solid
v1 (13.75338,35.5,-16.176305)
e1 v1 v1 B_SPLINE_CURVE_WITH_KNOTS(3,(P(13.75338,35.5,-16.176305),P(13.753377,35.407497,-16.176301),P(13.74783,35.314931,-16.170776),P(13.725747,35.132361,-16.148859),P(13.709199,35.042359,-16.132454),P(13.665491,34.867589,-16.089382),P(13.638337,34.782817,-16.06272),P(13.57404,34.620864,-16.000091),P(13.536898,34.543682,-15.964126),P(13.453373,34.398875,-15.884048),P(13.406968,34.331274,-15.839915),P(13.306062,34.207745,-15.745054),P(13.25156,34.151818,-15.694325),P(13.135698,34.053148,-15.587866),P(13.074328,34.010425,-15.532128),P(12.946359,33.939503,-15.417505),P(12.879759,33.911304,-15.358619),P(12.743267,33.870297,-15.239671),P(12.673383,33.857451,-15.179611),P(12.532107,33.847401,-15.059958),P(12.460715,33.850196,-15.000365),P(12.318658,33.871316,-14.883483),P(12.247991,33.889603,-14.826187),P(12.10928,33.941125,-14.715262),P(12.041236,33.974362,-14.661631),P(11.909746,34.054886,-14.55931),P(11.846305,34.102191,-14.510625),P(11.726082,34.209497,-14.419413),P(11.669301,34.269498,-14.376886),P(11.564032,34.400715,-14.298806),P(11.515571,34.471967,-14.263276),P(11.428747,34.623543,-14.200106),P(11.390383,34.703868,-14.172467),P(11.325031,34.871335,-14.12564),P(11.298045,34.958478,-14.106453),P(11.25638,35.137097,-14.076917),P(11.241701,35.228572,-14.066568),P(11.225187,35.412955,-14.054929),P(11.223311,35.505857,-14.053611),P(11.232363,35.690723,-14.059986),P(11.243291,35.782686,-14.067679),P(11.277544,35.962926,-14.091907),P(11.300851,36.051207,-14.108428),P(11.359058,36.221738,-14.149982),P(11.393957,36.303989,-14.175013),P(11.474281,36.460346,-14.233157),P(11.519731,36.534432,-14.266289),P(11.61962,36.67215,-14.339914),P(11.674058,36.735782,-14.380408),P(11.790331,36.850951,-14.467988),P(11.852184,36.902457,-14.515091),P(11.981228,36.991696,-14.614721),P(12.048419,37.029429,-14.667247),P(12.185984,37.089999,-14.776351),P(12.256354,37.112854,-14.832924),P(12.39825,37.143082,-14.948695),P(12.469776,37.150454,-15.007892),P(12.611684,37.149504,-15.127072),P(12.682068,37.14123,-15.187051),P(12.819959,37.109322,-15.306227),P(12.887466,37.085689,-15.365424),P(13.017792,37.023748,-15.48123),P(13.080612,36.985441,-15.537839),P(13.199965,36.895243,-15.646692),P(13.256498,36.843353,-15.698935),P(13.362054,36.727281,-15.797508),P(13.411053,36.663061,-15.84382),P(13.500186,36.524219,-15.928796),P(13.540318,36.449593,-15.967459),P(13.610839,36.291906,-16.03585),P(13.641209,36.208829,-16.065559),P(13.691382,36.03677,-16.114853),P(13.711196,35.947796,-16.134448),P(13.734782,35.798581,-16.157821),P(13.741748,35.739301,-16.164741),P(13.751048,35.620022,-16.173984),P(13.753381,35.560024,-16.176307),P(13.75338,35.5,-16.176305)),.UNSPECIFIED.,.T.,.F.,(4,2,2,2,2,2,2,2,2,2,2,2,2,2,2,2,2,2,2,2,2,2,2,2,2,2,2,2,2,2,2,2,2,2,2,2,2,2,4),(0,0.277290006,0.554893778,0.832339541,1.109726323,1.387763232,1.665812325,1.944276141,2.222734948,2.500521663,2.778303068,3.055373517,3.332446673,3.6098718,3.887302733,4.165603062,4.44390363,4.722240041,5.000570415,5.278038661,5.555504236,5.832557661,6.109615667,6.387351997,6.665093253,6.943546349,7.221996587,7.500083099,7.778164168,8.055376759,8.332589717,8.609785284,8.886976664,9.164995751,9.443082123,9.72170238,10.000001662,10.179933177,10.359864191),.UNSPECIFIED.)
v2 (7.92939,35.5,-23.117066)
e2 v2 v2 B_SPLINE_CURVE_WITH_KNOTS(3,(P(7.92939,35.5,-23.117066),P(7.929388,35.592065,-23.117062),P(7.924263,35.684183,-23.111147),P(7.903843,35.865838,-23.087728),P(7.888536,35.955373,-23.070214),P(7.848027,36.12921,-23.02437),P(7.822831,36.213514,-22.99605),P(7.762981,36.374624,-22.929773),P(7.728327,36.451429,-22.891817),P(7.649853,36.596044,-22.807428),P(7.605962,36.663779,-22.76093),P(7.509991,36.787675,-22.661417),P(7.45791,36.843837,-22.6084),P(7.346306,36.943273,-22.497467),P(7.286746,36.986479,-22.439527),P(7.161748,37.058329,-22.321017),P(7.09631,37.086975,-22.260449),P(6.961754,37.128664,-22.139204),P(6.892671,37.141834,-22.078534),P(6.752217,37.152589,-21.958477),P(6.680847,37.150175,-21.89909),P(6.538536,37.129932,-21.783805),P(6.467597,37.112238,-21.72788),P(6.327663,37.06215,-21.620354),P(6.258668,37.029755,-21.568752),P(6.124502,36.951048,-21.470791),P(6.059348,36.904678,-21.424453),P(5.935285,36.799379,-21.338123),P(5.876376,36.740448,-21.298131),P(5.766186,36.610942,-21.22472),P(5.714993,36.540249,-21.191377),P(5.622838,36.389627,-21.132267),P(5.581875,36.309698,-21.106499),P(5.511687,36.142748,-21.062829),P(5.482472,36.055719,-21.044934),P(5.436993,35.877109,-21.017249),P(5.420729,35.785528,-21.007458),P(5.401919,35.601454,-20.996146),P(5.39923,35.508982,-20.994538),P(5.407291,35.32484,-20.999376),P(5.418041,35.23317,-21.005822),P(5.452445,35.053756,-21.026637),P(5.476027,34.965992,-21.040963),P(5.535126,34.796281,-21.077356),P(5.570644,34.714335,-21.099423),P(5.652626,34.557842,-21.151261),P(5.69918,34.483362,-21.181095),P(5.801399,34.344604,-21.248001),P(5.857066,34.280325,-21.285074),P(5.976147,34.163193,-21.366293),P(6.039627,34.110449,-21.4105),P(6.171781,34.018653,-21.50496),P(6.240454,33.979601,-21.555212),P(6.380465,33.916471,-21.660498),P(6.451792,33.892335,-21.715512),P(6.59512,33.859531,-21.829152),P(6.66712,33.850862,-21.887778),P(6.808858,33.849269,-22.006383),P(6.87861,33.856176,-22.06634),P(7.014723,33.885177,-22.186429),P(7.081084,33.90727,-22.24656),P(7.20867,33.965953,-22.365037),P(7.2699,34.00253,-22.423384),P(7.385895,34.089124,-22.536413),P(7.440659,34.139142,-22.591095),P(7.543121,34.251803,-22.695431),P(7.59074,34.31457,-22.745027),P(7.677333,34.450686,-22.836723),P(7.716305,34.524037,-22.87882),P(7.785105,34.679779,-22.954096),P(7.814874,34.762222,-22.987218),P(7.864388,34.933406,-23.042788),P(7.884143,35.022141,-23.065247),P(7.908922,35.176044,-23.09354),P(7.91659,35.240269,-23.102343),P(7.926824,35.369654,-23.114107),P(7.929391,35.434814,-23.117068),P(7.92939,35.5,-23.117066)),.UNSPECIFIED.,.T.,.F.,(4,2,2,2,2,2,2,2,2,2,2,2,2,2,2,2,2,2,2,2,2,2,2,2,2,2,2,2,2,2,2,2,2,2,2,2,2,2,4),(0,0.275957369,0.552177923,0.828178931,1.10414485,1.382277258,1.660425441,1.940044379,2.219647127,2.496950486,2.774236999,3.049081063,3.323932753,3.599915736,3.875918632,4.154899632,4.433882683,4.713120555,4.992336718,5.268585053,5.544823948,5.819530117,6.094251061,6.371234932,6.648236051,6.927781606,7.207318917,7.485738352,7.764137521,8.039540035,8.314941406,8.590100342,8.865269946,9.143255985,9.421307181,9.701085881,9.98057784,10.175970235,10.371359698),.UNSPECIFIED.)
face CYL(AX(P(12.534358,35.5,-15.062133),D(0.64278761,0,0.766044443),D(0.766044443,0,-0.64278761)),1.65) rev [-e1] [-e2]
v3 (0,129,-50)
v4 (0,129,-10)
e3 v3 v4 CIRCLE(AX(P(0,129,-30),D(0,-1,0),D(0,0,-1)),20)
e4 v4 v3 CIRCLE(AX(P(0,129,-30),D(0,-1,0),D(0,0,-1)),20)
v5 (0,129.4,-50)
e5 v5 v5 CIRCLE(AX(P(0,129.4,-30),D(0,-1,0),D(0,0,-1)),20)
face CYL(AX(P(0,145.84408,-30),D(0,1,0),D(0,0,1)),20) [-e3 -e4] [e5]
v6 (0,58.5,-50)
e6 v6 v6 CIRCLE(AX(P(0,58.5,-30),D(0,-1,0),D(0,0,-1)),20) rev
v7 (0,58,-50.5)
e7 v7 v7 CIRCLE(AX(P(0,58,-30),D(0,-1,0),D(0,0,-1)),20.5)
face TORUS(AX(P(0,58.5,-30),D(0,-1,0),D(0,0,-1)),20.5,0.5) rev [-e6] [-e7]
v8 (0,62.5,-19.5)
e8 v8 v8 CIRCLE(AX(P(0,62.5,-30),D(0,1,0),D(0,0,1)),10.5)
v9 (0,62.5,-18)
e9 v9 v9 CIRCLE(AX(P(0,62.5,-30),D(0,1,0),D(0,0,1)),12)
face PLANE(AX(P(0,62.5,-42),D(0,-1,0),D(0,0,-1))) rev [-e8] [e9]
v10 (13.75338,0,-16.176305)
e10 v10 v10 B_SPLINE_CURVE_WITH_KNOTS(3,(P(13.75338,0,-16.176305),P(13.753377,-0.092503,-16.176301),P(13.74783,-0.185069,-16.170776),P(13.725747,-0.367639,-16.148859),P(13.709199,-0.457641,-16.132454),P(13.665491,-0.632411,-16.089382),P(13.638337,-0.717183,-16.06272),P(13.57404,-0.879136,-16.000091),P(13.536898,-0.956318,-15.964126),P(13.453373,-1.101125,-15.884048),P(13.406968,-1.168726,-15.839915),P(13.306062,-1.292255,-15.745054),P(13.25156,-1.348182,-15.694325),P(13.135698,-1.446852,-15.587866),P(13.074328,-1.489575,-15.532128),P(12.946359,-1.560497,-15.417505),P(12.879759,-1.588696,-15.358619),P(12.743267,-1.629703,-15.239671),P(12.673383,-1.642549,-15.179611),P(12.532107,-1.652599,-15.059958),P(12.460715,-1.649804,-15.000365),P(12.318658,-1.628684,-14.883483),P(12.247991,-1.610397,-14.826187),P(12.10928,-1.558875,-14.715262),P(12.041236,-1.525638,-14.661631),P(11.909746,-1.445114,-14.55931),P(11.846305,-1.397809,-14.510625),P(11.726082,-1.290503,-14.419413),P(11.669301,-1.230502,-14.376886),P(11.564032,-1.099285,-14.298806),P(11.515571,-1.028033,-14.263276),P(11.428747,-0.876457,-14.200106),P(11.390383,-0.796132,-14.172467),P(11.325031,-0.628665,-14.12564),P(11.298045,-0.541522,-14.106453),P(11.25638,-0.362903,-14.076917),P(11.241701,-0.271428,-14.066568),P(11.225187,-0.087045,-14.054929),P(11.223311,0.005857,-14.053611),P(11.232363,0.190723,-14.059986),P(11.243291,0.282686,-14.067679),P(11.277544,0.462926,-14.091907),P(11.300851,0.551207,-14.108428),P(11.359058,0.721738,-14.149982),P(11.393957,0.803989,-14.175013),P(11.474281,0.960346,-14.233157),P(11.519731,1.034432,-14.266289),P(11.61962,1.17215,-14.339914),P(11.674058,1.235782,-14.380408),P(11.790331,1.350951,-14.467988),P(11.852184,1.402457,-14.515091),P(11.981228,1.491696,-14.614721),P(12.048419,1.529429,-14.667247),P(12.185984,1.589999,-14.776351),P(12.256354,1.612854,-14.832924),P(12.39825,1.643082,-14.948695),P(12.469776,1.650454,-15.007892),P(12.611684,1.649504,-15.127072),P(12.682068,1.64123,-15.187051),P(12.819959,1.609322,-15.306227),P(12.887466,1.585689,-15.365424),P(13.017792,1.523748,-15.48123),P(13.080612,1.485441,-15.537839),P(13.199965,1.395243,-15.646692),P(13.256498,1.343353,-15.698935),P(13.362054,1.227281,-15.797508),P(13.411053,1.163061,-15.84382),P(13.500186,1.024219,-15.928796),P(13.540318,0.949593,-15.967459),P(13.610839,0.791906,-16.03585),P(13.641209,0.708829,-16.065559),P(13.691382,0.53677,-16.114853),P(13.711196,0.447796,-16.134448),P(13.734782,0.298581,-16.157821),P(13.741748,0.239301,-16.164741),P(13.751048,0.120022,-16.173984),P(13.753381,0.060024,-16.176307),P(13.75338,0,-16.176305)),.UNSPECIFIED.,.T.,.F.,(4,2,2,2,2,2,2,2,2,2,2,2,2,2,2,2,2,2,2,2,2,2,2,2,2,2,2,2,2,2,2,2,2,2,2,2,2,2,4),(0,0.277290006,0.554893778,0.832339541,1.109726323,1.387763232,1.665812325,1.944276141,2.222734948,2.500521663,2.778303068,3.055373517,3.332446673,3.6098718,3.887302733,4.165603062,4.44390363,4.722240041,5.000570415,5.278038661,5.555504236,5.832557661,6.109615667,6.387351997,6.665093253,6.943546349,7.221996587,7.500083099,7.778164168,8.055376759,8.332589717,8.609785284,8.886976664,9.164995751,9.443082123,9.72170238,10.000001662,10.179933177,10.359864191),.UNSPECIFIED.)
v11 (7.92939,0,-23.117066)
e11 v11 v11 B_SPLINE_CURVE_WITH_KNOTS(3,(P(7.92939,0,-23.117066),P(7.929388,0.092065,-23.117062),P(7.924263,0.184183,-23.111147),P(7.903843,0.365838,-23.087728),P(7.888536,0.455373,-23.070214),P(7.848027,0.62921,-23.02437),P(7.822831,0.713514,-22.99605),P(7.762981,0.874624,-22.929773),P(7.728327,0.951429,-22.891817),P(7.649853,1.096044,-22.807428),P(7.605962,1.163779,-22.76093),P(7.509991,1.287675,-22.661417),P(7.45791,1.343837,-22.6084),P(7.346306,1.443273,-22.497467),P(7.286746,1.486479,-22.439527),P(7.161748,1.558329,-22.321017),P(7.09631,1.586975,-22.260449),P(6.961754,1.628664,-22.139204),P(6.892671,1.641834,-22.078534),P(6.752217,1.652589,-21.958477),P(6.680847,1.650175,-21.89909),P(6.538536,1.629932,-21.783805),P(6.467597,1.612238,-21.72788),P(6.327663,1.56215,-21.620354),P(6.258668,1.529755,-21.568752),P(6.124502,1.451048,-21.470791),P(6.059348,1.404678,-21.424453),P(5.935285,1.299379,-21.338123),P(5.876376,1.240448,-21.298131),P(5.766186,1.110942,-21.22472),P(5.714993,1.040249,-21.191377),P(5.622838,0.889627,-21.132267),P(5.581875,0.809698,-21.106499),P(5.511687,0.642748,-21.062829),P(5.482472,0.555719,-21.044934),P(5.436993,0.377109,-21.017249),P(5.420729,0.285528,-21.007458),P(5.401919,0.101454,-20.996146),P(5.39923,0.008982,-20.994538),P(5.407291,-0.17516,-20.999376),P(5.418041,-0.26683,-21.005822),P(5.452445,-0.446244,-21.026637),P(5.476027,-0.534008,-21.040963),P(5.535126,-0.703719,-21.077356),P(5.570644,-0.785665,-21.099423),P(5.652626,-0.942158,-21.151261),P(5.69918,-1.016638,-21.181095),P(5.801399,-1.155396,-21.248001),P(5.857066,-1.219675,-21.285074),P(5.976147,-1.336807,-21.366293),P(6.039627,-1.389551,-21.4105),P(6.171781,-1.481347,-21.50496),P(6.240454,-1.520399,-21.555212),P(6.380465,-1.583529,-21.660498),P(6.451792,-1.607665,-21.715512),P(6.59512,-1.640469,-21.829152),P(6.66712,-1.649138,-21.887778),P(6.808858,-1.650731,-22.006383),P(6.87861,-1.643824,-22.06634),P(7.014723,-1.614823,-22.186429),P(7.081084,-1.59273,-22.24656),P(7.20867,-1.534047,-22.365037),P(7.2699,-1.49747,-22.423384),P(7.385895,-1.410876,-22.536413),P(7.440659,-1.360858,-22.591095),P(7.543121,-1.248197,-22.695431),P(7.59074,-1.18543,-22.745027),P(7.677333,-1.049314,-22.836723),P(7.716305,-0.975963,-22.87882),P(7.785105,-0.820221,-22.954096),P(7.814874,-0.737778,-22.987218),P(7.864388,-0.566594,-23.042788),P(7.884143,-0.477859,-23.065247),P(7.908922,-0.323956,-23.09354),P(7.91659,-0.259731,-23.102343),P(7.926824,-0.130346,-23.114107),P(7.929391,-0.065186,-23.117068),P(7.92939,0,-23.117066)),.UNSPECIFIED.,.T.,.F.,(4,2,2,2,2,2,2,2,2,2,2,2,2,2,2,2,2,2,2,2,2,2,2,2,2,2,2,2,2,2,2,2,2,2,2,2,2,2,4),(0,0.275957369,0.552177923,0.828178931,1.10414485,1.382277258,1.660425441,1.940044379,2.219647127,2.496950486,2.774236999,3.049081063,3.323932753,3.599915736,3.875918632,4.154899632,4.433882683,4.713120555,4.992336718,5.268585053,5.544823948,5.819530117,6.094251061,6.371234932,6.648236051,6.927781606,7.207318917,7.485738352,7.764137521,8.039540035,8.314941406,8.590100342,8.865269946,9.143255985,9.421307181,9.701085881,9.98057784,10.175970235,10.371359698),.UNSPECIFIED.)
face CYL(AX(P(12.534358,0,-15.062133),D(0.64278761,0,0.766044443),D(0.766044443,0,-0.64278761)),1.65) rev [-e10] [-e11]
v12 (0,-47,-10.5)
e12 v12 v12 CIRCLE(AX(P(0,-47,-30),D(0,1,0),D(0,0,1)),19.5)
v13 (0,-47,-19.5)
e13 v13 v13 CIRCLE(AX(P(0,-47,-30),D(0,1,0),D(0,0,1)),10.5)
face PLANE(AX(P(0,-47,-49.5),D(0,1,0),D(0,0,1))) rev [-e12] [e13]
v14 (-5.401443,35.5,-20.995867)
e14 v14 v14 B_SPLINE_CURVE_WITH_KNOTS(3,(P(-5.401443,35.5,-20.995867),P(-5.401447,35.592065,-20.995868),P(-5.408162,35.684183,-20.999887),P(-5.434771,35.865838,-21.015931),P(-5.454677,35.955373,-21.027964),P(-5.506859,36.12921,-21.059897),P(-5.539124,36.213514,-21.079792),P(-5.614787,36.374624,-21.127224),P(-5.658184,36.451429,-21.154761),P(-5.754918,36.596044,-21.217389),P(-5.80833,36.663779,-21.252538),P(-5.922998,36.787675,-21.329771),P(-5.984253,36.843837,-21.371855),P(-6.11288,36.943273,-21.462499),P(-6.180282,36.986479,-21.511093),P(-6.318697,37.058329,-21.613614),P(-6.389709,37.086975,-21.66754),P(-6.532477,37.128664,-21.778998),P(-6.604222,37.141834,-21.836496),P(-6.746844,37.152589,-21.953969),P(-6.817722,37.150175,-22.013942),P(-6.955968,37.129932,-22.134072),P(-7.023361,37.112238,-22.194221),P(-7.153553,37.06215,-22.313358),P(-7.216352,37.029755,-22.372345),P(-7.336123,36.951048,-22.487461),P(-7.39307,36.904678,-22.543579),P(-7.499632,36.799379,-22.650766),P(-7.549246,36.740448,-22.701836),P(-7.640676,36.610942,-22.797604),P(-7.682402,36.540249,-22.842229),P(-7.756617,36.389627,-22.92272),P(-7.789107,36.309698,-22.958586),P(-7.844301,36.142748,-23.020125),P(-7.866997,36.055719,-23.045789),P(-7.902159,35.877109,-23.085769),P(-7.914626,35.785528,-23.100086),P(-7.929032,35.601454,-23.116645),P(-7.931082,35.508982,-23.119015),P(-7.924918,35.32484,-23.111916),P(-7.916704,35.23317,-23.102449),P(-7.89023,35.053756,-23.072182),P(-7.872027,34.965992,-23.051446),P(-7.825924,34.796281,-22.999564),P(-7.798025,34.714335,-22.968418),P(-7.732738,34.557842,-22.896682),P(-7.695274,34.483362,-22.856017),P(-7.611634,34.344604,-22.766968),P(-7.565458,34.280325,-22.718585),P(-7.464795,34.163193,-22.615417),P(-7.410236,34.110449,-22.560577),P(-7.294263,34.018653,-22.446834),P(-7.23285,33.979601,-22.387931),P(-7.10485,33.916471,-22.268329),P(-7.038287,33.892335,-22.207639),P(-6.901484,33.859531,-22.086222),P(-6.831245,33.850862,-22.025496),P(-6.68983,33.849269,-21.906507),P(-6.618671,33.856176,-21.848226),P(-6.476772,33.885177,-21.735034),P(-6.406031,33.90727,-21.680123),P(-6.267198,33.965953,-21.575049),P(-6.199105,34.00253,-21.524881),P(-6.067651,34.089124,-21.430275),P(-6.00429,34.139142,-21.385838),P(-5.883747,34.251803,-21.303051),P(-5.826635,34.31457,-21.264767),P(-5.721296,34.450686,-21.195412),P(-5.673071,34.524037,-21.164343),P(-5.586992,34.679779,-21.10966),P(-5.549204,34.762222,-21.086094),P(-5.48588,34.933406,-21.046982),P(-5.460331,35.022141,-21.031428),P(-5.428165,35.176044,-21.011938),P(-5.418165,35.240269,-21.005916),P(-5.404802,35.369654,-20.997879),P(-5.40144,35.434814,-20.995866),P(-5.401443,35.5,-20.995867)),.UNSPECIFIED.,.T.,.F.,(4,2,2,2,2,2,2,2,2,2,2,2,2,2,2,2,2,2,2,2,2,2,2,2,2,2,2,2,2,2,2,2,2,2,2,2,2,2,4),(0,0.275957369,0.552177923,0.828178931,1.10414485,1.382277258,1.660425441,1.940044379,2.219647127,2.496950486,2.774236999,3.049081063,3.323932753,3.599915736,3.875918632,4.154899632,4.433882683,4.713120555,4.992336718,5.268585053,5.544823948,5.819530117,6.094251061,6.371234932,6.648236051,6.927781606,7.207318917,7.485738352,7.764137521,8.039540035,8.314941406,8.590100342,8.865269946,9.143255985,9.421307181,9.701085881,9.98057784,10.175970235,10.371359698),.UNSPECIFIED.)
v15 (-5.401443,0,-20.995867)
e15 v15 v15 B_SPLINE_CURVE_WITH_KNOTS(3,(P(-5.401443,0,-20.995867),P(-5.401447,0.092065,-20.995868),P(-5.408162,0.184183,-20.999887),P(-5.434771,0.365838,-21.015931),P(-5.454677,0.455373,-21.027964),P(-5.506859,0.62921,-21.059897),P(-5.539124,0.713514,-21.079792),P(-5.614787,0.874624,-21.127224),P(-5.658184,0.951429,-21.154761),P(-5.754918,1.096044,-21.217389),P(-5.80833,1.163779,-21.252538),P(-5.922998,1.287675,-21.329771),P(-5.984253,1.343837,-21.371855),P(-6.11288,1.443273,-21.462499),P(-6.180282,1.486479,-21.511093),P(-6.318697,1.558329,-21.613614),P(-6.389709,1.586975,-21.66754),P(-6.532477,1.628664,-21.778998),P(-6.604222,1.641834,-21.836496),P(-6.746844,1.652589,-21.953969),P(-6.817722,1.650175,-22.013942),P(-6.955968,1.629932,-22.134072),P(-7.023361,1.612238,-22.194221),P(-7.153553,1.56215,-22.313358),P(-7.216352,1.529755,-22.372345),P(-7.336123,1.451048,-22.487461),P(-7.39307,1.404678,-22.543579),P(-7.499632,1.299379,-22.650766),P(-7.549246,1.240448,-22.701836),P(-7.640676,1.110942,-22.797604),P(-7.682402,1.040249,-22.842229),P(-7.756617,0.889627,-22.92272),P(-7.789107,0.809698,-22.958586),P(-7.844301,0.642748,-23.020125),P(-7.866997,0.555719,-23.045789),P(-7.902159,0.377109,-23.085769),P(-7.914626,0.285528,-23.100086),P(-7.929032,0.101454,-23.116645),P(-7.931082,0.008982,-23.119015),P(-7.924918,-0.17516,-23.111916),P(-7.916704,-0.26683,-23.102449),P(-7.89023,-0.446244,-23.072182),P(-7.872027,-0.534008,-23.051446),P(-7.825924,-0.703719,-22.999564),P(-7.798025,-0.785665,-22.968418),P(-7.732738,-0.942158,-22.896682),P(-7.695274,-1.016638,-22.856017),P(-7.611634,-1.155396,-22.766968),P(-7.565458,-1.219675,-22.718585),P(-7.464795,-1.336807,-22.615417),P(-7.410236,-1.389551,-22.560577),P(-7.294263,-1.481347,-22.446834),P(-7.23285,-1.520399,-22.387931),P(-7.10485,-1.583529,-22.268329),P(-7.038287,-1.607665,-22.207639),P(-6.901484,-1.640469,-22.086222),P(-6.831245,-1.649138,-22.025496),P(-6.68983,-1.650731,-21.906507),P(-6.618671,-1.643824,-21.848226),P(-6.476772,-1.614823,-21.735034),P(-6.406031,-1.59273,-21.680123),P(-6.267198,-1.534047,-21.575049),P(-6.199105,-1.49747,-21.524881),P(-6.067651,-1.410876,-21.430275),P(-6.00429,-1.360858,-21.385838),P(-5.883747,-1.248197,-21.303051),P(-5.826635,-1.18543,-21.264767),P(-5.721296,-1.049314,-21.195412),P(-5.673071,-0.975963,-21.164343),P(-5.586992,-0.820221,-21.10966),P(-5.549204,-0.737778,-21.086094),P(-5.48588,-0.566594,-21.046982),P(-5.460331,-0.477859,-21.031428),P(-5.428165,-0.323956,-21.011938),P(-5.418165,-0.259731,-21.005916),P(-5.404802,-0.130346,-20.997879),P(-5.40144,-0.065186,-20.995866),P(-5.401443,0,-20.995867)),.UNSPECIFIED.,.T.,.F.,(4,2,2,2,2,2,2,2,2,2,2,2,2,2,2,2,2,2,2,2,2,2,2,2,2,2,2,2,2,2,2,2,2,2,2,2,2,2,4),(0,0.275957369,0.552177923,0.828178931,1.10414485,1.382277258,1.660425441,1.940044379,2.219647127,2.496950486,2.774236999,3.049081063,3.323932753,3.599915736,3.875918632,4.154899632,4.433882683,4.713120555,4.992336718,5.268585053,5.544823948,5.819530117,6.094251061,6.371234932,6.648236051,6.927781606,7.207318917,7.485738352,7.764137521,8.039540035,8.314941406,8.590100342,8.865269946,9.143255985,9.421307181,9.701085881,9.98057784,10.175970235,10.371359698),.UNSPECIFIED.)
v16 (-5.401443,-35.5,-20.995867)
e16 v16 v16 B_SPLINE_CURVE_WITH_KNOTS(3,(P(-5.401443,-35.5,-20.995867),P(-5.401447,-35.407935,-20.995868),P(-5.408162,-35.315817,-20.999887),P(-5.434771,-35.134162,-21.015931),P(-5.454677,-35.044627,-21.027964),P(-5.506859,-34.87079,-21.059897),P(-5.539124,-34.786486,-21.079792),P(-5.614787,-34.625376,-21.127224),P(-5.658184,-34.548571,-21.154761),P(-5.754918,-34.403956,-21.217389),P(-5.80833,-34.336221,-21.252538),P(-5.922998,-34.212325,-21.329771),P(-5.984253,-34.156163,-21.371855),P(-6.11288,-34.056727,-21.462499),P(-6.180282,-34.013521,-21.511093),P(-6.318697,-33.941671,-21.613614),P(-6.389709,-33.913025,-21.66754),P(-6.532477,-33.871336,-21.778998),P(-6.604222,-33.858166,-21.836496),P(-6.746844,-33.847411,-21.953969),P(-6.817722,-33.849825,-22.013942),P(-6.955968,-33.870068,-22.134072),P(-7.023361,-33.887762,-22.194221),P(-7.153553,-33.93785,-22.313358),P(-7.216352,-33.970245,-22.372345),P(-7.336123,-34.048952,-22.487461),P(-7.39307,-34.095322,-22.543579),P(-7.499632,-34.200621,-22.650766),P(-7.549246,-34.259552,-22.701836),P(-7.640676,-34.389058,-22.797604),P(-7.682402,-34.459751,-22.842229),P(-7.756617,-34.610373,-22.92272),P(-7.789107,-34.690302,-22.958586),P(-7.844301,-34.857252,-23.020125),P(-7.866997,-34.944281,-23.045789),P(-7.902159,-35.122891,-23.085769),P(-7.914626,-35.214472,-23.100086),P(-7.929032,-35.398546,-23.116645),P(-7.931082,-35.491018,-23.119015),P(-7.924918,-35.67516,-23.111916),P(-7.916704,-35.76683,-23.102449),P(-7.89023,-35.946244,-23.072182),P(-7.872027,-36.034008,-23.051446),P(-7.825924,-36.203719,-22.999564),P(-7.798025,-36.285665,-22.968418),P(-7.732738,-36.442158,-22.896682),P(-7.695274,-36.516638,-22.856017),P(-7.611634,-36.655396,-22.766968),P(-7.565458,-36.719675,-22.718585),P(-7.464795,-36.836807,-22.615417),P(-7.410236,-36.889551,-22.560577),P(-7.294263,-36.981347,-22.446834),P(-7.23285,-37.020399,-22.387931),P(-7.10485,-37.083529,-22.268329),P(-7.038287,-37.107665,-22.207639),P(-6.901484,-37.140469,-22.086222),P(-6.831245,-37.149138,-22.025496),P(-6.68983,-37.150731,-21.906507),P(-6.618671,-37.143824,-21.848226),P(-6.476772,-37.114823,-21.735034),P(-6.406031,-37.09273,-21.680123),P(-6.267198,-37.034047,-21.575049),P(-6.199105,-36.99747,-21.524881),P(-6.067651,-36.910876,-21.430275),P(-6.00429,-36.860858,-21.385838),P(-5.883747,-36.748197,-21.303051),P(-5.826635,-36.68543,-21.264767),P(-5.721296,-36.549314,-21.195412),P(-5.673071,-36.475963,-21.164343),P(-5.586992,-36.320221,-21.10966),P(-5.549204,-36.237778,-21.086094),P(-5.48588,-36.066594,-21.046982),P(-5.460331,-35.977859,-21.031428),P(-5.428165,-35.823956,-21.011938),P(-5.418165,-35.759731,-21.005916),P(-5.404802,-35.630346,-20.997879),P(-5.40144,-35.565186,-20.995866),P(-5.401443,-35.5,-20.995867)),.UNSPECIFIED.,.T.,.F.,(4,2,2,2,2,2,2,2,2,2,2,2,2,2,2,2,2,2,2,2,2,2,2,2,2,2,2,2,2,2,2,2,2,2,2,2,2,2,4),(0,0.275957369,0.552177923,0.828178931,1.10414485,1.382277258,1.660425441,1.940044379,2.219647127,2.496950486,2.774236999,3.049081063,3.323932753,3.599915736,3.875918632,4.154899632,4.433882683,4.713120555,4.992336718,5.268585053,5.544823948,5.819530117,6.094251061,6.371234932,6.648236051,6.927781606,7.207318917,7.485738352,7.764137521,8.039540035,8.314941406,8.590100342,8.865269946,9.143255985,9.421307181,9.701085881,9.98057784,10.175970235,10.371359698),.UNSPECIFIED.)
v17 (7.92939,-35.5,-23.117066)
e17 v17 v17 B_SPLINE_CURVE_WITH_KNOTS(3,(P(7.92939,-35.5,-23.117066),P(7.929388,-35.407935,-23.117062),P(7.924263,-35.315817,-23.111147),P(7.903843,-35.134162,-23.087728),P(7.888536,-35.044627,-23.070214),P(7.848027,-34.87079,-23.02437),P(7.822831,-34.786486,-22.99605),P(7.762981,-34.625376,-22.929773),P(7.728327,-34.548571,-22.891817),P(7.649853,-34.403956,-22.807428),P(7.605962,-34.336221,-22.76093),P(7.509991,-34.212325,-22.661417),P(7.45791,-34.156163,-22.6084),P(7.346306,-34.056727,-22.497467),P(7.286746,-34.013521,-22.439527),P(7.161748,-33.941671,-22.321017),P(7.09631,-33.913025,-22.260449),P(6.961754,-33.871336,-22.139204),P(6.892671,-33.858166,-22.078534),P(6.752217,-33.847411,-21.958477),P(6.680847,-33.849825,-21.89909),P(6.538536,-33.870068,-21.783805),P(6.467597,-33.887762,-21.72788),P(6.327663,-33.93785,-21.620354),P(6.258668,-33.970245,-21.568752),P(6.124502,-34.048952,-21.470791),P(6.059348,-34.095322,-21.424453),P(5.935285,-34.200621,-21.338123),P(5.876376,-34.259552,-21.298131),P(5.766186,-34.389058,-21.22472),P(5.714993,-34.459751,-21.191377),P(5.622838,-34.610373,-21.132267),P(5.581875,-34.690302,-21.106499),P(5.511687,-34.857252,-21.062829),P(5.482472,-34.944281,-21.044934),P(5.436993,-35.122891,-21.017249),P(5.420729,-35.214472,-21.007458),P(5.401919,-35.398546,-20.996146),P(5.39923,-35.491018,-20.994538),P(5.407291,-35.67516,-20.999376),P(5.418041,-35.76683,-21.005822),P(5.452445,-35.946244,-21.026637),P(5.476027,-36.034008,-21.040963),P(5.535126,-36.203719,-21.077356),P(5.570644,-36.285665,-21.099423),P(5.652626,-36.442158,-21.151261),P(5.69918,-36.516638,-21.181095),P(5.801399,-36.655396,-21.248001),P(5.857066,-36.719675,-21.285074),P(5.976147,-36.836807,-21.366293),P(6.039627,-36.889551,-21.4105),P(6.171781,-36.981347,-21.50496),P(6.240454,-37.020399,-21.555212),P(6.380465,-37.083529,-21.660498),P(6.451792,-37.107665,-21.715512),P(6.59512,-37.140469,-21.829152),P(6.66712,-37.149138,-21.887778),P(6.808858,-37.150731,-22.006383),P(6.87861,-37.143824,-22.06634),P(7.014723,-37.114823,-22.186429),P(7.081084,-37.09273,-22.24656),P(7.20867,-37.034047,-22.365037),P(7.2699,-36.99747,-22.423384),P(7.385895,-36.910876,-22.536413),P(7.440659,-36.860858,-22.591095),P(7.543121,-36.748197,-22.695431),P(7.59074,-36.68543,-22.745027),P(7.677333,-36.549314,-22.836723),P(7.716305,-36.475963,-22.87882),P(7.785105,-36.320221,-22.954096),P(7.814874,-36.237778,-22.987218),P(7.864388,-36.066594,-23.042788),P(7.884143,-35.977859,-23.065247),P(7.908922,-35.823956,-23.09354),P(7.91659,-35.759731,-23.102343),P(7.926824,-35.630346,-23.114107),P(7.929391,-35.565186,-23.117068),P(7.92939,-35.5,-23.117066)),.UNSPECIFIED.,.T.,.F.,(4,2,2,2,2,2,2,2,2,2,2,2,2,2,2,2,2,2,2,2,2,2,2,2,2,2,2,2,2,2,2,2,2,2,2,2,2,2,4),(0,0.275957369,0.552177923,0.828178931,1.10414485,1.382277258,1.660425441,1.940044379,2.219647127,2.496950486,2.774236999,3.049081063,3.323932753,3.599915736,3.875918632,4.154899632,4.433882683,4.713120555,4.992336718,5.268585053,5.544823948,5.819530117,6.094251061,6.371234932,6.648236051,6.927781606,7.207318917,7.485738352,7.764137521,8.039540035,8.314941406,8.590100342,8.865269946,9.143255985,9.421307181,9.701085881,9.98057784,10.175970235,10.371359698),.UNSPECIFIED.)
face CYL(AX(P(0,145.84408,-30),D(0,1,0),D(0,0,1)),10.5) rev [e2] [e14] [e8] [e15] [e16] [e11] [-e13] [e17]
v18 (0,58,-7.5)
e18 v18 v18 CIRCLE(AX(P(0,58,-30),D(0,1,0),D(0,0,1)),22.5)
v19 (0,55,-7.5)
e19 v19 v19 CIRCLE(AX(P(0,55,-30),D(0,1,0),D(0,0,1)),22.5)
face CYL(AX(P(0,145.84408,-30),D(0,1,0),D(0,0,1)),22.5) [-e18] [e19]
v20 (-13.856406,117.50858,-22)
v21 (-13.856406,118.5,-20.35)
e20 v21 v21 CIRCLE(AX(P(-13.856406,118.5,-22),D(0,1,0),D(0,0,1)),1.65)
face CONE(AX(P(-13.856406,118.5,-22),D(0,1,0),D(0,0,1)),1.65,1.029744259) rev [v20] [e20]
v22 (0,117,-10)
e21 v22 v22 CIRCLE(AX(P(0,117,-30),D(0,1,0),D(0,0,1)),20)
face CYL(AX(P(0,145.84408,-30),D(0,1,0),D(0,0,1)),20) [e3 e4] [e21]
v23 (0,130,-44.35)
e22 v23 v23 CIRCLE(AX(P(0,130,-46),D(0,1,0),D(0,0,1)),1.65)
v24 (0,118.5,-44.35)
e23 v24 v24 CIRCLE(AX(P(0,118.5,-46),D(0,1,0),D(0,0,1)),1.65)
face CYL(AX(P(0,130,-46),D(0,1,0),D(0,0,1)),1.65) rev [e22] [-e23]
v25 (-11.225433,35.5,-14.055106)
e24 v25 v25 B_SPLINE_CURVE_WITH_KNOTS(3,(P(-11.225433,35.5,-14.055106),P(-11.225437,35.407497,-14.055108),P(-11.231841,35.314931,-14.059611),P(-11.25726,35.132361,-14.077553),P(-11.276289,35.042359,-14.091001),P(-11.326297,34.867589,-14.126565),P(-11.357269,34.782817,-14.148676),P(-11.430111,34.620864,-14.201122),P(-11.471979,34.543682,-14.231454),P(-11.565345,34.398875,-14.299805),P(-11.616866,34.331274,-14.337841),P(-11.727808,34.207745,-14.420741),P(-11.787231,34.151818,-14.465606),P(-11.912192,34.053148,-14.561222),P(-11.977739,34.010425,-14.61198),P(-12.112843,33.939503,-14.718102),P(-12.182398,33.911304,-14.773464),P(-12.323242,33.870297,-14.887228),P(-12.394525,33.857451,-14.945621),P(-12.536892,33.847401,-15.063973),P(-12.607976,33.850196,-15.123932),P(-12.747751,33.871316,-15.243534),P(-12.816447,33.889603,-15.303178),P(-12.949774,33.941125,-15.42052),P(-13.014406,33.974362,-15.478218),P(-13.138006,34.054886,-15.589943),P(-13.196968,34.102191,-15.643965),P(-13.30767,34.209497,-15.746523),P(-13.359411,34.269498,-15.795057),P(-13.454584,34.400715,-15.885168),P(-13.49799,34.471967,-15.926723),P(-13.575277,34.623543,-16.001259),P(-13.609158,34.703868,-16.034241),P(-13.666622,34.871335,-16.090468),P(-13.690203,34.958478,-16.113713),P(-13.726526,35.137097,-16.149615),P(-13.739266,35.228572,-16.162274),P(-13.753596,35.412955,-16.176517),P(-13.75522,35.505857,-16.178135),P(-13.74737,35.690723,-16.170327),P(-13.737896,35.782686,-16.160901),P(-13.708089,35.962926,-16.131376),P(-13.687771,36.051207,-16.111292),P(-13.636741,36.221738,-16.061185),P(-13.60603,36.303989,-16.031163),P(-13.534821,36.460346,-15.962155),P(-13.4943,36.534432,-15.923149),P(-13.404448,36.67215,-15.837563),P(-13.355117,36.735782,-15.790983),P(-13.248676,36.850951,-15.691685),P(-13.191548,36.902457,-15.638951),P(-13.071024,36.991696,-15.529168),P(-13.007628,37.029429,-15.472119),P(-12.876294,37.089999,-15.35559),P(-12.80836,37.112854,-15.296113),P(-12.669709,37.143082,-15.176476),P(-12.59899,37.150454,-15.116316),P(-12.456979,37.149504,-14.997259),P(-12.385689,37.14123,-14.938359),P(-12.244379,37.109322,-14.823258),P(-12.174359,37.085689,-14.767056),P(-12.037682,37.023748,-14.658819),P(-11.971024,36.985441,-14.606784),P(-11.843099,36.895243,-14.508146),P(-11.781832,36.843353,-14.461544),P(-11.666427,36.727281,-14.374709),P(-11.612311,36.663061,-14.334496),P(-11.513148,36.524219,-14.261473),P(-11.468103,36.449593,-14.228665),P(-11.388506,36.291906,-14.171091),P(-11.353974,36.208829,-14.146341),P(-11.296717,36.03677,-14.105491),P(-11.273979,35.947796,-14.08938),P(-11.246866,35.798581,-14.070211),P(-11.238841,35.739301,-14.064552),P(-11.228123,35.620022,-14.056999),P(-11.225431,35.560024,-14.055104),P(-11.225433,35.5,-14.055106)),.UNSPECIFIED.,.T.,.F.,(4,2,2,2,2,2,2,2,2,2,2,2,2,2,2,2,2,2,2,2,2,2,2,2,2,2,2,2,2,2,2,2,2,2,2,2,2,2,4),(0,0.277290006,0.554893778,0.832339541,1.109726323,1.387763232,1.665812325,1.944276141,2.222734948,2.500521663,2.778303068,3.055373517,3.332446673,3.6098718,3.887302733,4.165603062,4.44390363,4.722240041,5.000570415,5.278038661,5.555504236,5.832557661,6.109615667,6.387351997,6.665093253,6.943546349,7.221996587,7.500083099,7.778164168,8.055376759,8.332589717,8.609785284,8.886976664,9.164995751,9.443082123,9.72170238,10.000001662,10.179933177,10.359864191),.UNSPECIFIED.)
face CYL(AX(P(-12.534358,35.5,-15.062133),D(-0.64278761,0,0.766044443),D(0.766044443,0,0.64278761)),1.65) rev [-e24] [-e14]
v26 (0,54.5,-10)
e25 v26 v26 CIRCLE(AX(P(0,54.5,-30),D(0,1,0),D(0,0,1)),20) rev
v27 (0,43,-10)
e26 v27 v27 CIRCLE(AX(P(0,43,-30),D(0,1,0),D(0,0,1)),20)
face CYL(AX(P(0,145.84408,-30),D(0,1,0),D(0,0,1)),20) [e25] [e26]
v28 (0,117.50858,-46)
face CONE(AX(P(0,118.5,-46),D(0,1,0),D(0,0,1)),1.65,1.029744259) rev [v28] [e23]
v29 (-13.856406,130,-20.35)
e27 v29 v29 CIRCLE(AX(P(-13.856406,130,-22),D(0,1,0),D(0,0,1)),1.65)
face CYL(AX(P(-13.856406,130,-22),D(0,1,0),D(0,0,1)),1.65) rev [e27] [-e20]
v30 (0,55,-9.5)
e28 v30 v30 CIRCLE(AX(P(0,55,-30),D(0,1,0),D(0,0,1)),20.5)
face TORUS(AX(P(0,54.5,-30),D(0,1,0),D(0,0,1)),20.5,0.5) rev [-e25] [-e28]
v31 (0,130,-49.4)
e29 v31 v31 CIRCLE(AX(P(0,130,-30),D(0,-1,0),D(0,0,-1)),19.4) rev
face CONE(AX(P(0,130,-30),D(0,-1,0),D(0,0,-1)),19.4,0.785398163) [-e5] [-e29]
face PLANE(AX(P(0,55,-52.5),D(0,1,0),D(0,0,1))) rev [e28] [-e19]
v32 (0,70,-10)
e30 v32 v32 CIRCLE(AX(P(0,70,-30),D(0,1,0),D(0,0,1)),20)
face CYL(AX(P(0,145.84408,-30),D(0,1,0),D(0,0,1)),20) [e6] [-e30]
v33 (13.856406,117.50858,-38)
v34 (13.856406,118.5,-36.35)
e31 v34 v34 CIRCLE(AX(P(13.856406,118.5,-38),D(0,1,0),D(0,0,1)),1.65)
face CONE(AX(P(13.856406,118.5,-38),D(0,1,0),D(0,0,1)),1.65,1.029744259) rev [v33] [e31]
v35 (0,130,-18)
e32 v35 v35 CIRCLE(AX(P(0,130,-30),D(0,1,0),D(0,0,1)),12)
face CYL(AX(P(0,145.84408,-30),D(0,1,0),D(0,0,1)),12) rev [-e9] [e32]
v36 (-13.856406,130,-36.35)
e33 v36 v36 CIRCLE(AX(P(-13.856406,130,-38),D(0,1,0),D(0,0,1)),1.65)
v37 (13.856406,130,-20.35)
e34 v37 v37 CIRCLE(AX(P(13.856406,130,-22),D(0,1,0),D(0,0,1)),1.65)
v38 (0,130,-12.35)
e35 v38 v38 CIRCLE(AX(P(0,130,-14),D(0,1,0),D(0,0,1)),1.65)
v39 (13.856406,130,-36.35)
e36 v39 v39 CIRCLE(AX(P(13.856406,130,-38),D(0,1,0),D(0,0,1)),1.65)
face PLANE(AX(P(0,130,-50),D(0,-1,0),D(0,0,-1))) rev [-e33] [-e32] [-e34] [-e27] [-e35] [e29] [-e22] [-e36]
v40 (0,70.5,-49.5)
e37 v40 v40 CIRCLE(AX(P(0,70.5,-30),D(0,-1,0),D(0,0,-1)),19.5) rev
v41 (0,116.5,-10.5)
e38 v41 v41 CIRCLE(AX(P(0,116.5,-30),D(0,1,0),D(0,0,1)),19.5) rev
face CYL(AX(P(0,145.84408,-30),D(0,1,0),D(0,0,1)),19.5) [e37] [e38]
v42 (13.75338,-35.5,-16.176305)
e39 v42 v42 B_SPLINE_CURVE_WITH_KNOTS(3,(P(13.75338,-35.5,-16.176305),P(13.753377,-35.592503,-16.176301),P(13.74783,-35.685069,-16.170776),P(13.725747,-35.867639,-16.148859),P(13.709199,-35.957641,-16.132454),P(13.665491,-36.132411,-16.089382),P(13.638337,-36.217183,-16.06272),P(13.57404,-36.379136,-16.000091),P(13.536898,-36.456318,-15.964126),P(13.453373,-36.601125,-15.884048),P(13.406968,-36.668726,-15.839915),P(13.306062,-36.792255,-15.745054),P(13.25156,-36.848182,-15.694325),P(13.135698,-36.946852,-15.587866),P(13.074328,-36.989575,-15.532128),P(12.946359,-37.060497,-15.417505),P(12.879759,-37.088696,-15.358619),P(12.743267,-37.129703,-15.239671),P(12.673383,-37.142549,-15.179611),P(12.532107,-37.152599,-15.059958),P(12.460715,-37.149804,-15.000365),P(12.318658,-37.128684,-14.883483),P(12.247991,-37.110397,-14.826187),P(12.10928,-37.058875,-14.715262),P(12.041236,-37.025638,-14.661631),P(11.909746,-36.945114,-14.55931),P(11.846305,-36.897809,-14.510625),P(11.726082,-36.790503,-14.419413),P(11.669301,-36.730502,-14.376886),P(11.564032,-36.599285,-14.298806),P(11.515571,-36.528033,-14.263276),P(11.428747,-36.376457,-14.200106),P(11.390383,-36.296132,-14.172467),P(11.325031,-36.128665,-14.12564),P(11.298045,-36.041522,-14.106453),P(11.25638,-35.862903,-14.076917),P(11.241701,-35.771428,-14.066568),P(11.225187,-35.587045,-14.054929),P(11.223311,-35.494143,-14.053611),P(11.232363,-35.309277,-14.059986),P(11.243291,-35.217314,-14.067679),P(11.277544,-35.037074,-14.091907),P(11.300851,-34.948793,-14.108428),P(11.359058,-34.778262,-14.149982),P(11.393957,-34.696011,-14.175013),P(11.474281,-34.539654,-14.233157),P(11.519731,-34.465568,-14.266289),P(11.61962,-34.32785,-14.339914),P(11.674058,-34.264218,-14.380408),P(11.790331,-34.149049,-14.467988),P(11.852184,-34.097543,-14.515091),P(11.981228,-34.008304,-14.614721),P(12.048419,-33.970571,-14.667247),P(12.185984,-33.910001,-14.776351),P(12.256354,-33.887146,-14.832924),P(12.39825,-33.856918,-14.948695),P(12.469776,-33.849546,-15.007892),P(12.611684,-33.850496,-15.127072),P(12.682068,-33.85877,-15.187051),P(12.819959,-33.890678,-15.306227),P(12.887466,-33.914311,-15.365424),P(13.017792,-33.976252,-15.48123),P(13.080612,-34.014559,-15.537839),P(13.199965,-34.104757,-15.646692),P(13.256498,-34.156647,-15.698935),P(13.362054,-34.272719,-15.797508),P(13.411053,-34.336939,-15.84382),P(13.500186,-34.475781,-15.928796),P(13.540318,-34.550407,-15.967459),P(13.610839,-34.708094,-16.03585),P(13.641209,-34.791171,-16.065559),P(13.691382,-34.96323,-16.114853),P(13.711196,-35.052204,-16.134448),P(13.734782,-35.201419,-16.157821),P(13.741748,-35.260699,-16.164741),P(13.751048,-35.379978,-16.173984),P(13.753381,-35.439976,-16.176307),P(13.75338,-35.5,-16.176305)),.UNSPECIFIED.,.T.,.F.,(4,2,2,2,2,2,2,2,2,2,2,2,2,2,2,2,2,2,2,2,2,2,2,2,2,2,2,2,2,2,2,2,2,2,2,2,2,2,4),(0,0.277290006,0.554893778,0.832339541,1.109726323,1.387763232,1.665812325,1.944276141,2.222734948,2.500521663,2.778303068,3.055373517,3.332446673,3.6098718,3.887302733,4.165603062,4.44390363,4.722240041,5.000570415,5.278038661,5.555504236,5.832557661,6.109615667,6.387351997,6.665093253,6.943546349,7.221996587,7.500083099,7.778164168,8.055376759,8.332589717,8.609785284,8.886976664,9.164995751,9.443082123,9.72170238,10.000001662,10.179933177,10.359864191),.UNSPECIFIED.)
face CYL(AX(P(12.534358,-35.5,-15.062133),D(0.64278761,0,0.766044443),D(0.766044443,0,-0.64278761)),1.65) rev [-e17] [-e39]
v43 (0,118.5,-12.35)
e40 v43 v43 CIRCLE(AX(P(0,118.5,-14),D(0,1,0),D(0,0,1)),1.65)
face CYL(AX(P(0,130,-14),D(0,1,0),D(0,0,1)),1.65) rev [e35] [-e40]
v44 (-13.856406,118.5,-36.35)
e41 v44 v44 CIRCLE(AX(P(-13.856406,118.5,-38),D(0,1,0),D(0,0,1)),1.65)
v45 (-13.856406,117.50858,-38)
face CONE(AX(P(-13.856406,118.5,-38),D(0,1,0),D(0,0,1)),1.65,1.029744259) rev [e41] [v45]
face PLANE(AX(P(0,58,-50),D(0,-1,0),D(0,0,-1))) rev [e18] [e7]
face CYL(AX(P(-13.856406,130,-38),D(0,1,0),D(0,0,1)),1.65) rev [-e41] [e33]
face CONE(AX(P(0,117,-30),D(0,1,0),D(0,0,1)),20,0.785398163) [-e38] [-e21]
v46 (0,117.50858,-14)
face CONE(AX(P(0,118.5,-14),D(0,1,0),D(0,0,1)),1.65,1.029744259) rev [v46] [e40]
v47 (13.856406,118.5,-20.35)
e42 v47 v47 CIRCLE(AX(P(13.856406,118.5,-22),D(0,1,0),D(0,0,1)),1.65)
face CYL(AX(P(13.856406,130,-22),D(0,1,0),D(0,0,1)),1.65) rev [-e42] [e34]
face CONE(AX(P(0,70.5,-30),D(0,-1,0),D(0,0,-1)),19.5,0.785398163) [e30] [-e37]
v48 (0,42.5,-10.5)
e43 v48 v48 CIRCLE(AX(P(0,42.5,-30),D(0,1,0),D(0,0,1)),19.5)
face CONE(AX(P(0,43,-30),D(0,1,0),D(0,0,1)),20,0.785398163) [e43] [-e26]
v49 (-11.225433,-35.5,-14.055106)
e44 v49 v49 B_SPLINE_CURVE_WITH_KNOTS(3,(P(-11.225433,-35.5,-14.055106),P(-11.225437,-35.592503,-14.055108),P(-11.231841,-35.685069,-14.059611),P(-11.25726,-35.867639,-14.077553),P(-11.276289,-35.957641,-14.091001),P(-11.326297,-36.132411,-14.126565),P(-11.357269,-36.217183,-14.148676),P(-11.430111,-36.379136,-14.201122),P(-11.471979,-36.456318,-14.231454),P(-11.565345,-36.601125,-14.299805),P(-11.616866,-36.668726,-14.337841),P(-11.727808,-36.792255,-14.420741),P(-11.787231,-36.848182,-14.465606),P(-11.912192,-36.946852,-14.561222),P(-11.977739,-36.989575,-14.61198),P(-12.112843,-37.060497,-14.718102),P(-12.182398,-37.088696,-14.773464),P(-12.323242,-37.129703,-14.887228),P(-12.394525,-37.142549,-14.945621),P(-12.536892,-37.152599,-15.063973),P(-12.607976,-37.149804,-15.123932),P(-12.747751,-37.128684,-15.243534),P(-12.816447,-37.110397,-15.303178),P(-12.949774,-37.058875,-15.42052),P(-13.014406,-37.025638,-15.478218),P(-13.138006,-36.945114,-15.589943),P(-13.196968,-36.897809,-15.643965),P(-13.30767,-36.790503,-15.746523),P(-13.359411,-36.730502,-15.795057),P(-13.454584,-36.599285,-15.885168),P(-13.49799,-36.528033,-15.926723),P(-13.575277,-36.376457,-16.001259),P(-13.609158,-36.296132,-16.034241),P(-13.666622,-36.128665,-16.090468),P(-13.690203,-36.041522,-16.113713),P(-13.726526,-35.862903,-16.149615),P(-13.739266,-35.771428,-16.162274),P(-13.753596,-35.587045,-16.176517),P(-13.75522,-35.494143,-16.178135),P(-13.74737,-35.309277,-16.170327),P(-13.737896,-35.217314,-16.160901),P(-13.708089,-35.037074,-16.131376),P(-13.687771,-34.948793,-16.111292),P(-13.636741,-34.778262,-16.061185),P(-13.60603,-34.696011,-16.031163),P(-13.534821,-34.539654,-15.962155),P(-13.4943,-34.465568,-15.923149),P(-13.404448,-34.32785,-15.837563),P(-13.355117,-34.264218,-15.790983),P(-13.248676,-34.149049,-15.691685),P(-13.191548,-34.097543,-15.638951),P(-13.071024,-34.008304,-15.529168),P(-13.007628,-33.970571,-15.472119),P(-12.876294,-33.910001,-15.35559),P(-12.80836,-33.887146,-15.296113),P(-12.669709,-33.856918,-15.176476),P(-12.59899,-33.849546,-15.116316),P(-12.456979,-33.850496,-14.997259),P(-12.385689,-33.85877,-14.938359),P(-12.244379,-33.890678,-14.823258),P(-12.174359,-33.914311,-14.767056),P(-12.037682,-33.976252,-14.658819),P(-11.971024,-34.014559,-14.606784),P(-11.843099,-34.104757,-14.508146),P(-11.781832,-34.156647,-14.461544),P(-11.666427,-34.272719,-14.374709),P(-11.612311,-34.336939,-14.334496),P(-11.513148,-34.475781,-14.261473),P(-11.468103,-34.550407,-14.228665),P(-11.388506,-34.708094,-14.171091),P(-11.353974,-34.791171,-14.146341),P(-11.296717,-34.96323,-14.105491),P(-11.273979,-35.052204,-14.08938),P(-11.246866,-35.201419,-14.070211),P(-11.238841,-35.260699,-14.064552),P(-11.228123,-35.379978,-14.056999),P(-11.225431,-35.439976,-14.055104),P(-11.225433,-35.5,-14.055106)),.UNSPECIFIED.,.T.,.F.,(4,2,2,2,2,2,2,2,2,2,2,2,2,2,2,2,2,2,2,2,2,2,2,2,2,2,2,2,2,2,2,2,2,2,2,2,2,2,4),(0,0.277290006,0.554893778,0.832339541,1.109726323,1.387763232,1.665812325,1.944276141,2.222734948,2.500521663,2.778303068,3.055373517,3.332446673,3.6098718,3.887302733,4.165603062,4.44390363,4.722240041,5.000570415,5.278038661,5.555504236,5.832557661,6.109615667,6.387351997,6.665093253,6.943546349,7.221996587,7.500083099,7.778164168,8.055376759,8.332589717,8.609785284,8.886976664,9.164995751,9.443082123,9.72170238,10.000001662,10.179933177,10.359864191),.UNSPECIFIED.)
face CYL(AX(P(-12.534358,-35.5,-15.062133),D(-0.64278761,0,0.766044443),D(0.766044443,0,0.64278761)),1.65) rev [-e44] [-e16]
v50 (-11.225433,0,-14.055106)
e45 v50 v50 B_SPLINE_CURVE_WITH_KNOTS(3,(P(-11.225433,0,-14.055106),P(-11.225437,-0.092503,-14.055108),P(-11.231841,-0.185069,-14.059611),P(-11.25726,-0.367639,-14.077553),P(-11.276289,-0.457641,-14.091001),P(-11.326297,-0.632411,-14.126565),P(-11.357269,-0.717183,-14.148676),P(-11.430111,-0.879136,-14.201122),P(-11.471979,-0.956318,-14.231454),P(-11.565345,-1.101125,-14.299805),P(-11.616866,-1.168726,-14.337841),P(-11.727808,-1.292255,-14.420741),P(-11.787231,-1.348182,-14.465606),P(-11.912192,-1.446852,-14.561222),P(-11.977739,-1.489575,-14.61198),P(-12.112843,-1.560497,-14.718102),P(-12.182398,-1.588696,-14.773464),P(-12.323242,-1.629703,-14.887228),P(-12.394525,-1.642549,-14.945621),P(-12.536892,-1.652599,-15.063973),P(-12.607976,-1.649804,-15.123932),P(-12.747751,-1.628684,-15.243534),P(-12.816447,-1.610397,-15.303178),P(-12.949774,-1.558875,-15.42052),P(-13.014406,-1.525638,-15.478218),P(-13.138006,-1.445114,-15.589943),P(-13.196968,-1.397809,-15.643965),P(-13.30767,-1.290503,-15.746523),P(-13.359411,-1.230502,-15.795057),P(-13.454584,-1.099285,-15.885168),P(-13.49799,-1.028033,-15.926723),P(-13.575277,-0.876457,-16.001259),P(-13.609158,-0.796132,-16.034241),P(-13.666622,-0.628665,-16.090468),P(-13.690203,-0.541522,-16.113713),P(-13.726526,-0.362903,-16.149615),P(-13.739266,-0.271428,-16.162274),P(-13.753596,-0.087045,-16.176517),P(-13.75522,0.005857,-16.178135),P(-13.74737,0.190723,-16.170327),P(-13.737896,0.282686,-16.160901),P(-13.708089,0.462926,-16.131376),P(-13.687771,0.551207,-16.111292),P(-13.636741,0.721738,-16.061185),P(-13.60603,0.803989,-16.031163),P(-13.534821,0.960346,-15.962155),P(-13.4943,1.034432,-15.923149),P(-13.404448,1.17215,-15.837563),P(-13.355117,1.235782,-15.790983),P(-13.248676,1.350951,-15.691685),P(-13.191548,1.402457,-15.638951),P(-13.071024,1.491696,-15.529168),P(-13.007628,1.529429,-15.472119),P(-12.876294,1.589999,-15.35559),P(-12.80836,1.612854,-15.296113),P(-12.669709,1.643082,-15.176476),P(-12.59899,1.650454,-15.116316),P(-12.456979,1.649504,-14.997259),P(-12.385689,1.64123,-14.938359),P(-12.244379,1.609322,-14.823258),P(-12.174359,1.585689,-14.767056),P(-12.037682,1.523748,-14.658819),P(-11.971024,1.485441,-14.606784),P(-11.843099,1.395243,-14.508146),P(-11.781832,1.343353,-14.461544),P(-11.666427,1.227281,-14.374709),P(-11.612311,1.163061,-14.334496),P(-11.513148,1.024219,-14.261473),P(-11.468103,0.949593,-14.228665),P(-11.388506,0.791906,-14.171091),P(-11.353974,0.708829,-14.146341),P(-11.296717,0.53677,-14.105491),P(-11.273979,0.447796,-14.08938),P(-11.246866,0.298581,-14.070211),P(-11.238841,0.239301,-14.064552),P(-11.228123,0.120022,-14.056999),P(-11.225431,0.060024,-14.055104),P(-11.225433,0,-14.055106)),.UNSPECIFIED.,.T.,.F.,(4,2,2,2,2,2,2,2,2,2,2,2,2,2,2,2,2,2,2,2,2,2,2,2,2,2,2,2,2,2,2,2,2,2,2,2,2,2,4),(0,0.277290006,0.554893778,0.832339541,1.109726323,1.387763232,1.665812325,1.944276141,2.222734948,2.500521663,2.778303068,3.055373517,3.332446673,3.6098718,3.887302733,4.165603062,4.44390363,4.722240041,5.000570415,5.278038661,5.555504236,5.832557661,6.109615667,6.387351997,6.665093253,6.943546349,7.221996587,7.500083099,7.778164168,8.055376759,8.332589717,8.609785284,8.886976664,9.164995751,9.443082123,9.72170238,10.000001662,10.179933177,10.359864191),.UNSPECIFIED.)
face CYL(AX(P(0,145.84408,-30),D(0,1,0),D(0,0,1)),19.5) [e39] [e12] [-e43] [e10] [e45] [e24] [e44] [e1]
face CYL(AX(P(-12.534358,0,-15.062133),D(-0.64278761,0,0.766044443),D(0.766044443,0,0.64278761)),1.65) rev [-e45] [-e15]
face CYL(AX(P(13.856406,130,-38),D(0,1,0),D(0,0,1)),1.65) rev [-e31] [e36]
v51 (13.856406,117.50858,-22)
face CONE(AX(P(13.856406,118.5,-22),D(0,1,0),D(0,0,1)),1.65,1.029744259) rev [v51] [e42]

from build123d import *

# Parameters (mm, degrees)
SKETCH6_W                     = 2.15
SKETCH6_H                     = 180.5
M4_CLEARANCE_HOLE2_AT_2_COUNT = 2
M4_CLEARANCE_HOLE2_AT_2_PITCH = 16
M4_CLEARANCE_HOLE2_AT_3_COUNT = 2
M4_CLEARANCE_HOLE2_AT_3_PITCH = 27.712812921
M4_CLEARANCE_HOLE2_AT_4_COUNT = 2
M4_CLEARANCE_HOLE2_AT_4_PITCH = 32
M4_CLEARANCE_HOLE2_AT_5_COUNT = 2
M4_CLEARANCE_HOLE2_AT_5_PITCH = 27.712812921
M4_CLEARANCE_HOLE2_AT_6_COUNT = 2
M4_CLEARANCE_HOLE2_AT_6_PITCH = 16
M4_TAPPED_HOLE1_AT_2_COUNT    = 2
M4_TAPPED_HOLE1_AT_2_PITCH    = 16
M4_TAPPED_HOLE1_AT_3_COUNT    = 2
M4_TAPPED_HOLE1_AT_3_PITCH    = 27.712812921
M4_TAPPED_HOLE1_AT_4_COUNT    = 2
M4_TAPPED_HOLE1_AT_4_PITCH    = 16
M4_TAPPED_HOLE1_AT_5_COUNT    = 2
M4_TAPPED_HOLE1_AT_5_PITCH    = 27.712812921
M4_TAPPED_HOLE1_AT_6_COUNT    = 2
M4_TAPPED_HOLE1_AT_6_PITCH    = 32
SKETCH16_W                    = 1.65
SKETCH16_H                    = 19.5
SKETCH16_AT_POINT_2_W         = 1.65
SKETCH16_AT_POINT_2_H         = 19.5
SKETCH16_AT_POINT_3_W         = 1.65
SKETCH16_AT_POINT_3_H         = 19.5
SKETCH16_AT_POINT_4_W         = 1.65
SKETCH16_AT_POINT_4_H         = 19.5
SKETCH16_AT_POINT_5_W         = 1.65
SKETCH16_AT_POINT_5_H         = 19.5
SKETCH16_AT_POINT_6_W         = 1.65
SKETCH16_AT_POINT_6_H         = 19.5
CHAMFER1_SIZE                 = 0.6
FILLET1_R                     = 0.5
FILLET2_R                     = 0.4
CHAMFER2_SIZE                 = 0.5


with BuildPart() as part:
    # Sketch1 → Revolve1 (revolve)
    with BuildSketch(Plane(origin=(0, 0, 0), x_dir=(0, 0, -1), z_dir=(1, 0, 0)), mode=Mode.PRIVATE) as revolve1_sk:
        Polygon((50, 130), (50, 117), (49.5, 117), (49.5, 70), (50, 70), (50, 58), (52.5, 58), (52.5, 55), (50, 55), (50, 42.5), (49.5, 42.5), (49.5, -47), (40.5, -47), (40.5, 62.5), (42, 62.5), (42, 130), align=None)
    revolve(revolve1_sk.sketch.rotate(Axis((0, 145.844079722, -30), (0, -1, 0)), 180), axis=Axis((0, 145.844079722, -30), (0, -1, 0)))

    # Sketch12 → M4 Tapped Hole1 (revolve, cut)
    with BuildSketch(Plane(origin=(0, 130, -46), x_dir=(0, 0, 1), z_dir=(1, 0, 0))):
        Polygon((0, 0), (0, 12.491420021), (1.65, 11.5), (1.65, 0), align=None)
    m4_tapped_hole1 = revolve(axis=Axis((0, 136.35, -46), (0, -1, 0)), mode=Mode.SUBTRACT)

    # M4 Tapped Hole1 at 2: M4 Tapped Hole1 ×2
    with Locations(*[Vector(0.8660254037844387, 0, 0.5000000000000001) * (i * M4_TAPPED_HOLE1_AT_2_PITCH) for i in range(1, M4_TAPPED_HOLE1_AT_2_COUNT)]):
        add(m4_tapped_hole1, mode=Mode.SUBTRACT)

    # M4 Tapped Hole1 at 3: M4 Tapped Hole1 ×2
    with Locations(*[Vector(0.5000000000000002, 0, 0.8660254037844386) * (i * M4_TAPPED_HOLE1_AT_3_PITCH) for i in range(1, M4_TAPPED_HOLE1_AT_3_COUNT)]):
        add(m4_tapped_hole1, mode=Mode.SUBTRACT)

    # M4 Tapped Hole1 at 4: M4 Tapped Hole1 ×2
    with Locations(*[Vector(-0.8660254037844387, 0, 0.5000000000000001) * (i * M4_TAPPED_HOLE1_AT_4_PITCH) for i in range(1, M4_TAPPED_HOLE1_AT_4_COUNT)]):
        add(m4_tapped_hole1, mode=Mode.SUBTRACT)

    # M4 Tapped Hole1 at 5: M4 Tapped Hole1 ×2
    with Locations(*[Vector(-0.4999999999999997, 0, 0.8660254037844388) * (i * M4_TAPPED_HOLE1_AT_5_PITCH) for i in range(1, M4_TAPPED_HOLE1_AT_5_COUNT)]):
        add(m4_tapped_hole1, mode=Mode.SUBTRACT)

    # M4 Tapped Hole1 at 6: M4 Tapped Hole1 ×2
    with Locations(*[(0, 0, i * M4_TAPPED_HOLE1_AT_6_PITCH) for i in range(1, M4_TAPPED_HOLE1_AT_6_COUNT)]):
        add(m4_tapped_hole1, mode=Mode.SUBTRACT)

    # Sketch16 → M4 Tapped Hole2 (revolve, cut)
    with BuildSketch(Plane(origin=(12.534358389, 35.5, -15.062133359), x_dir=(0.7660444431189759, 0, -0.642787609686542), z_dir=(0, 1, 0))):
        with Locations((0.825, 9.75)):
            Rectangle(SKETCH16_W, SKETCH16_H)
    revolve(axis=Axis((16.61605971, 35.5, -10.197751145), (-0.6427876096865419, 0, -0.7660444431189758)), mode=Mode.SUBTRACT)

    # Sketch16 at point 2 (carried to point 2, square into its face) → M4 Tapped Hole2 at 2 (revolve, cut)
    with BuildSketch(Plane(origin=(12.534358389, 0, -15.062133359), x_dir=(0.766044068, 0, -0.642788057), z_dir=(0, 1, 0))):
        with Locations((0.825, 9.75)):
            Rectangle(SKETCH16_AT_POINT_2_W, SKETCH16_AT_POINT_2_H)
    revolve(axis=Axis((16.61606255, 0, -10.197753528), (-0.642788057, 0, -0.766044068)), mode=Mode.SUBTRACT)

    # Sketch16 at point 3 (carried to point 3, square into its face) → M4 Tapped Hole2 at 3 (revolve, cut)
    with BuildSketch(Plane(origin=(12.534358389, -35.5, -15.062133359), x_dir=(0.766044068, 0, -0.642788057), z_dir=(0, 1, 0))):
        with Locations((0.825, 9.75)):
            Rectangle(SKETCH16_AT_POINT_3_W, SKETCH16_AT_POINT_3_H)
    revolve(axis=Axis((16.61606255, -35.5, -10.197753528), (-0.642788057, 0, -0.766044068)), mode=Mode.SUBTRACT)

    # Sketch16 at point 4 (carried to point 4, square into its face) → M4 Tapped Hole2 at 4 (revolve, cut)
    with BuildSketch(Plane(origin=(-12.534358389, -35.5, -15.062133359), x_dir=(0.766044068, 0, 0.642788057), z_dir=(0, 1, 0))):
        with Locations((0.825, 9.75)):
            Rectangle(SKETCH16_AT_POINT_4_W, SKETCH16_AT_POINT_4_H)
    revolve(axis=Axis((-16.61606255, -35.5, -10.197753528), (0.642788057, 0, -0.766044068)), mode=Mode.SUBTRACT)

    # Sketch16 at point 5 (carried to point 5, square into its face) → M4 Tapped Hole2 at 5 (revolve, cut)
    with BuildSketch(Plane(origin=(-12.534358389, 0, -15.062133359), x_dir=(0.766044068, 0, 0.642788057), z_dir=(0, 1, 0))):
        with Locations((0.825, 9.75)):
            Rectangle(SKETCH16_AT_POINT_5_W, SKETCH16_AT_POINT_5_H)
    revolve(axis=Axis((-16.61606255, 0, -10.197753528), (0.642788057, 0, -0.766044068)), mode=Mode.SUBTRACT)

    # Sketch16 at point 6 (carried to point 6, square into its face) → M4 Tapped Hole2 at 6 (revolve, cut)
    with BuildSketch(Plane(origin=(-12.534358389, 35.5, -15.062133359), x_dir=(0.766044068, 0, 0.642788057), z_dir=(0, 1, 0))):
        with Locations((0.825, 9.75)):
            Rectangle(SKETCH16_AT_POINT_6_W, SKETCH16_AT_POINT_6_H)
    revolve(axis=Axis((-16.61606255, 35.5, -10.197753528), (0.642788057, 0, -0.766044068)), mode=Mode.SUBTRACT)

    # Chamfer1
    chamfer1_edges = [part.edges().sort_by_distance(p)[0] for p in [
        (0, 130, -50),
    ]]
    chamfer(chamfer1_edges, length=CHAMFER1_SIZE)

    # Fillet1
    fillet1_edges = [part.edges().sort_by_distance(p)[0] for p in [
        (0, 58, -50),
        (0, 55, -50),
    ]]
    fillet(fillet1_edges, radius=FILLET1_R)

    # Chamfer2
    chamfer2_edges = [part.edges().sort_by_distance(p)[0] for p in [
        (0, 42.5, -50),
        (0, 117, -49.5),
        (0, 70, -49.5),
    ]]
    chamfer(chamfer2_edges, length=CHAMFER2_SIZE - 0.0001)  # a hair under: the kernel refuses the full size


with BuildPart() as body_2:
    # Sketch2 → Revolve2 (revolve)
    with BuildSketch(Plane(origin=(0, 0, 0), x_dir=(0, 0, -1), z_dir=(1, 0, 0)), mode=Mode.PRIVATE) as revolve2_sk:
        Polygon((42, 133.5), (52.5, 133.5), (52.5, 129), (50, 129), (50, 130.5), (42, 130.5), align=None)
    revolve(revolve2_sk.sketch.rotate(Axis((0, 145.844079722, -30), (0, -1, 0)), 180), axis=Axis((0, 145.844079722, -30), (0, -1, 0)))

    # Sketch6 → M4 Clearance Hole2 (revolve, cut)
    with BuildSketch(Plane(origin=(-13.856406461, 133.5, -38), x_dir=(0, 0, 1), z_dir=(1, 0, 0))):
        with Locations((1.075, 90.25)):
            Rectangle(SKETCH6_W, SKETCH6_H)
    m4_clearance_hole2 = revolve(axis=Axis((-13.856406461, 139.85, -38), (0, -1, 0)), mode=Mode.SUBTRACT)

    # M4 Clearance Hole2 at 2: M4 Clearance Hole2 ×2
    with Locations(*[Vector(0.8660254037844387, 0, -0.5000000000000001) * (i * M4_CLEARANCE_HOLE2_AT_2_PITCH) for i in range(1, M4_CLEARANCE_HOLE2_AT_2_COUNT)]):
        add(m4_clearance_hole2, mode=Mode.SUBTRACT)

    # M4 Clearance Hole2 at 3: M4 Clearance Hole2 ×2
    with Locations(*[(i * M4_CLEARANCE_HOLE2_AT_3_PITCH, 0, 0) for i in range(1, M4_CLEARANCE_HOLE2_AT_3_COUNT)]):
        add(m4_clearance_hole2, mode=Mode.SUBTRACT)

    # M4 Clearance Hole2 at 4: M4 Clearance Hole2 ×2
    with Locations(*[Vector(0.8660254037844387, 0, 0.49999999999999994) * (i * M4_CLEARANCE_HOLE2_AT_4_PITCH) for i in range(1, M4_CLEARANCE_HOLE2_AT_4_COUNT)]):
        add(m4_clearance_hole2, mode=Mode.SUBTRACT)

    # M4 Clearance Hole2 at 5: M4 Clearance Hole2 ×2
    with Locations(*[Vector(0.5000000000000001, 0, 0.8660254037844387) * (i * M4_CLEARANCE_HOLE2_AT_5_PITCH) for i in range(1, M4_CLEARANCE_HOLE2_AT_5_COUNT)]):
        add(m4_clearance_hole2, mode=Mode.SUBTRACT)

    # M4 Clearance Hole2 at 6: M4 Clearance Hole2 ×2
    with Locations(*[(0, 0, i * M4_CLEARANCE_HOLE2_AT_6_PITCH) for i in range(1, M4_CLEARANCE_HOLE2_AT_6_COUNT)]):
        add(m4_clearance_hole2, mode=Mode.SUBTRACT)

    # Fillet2
    fillet2_edges = [body_2.edges().sort_by_distance(p)[0] for p in [
        (0, 130.5, -50),
    ]]
    fillet(fillet2_edges, radius=FILLET2_R)


solid = part.part
